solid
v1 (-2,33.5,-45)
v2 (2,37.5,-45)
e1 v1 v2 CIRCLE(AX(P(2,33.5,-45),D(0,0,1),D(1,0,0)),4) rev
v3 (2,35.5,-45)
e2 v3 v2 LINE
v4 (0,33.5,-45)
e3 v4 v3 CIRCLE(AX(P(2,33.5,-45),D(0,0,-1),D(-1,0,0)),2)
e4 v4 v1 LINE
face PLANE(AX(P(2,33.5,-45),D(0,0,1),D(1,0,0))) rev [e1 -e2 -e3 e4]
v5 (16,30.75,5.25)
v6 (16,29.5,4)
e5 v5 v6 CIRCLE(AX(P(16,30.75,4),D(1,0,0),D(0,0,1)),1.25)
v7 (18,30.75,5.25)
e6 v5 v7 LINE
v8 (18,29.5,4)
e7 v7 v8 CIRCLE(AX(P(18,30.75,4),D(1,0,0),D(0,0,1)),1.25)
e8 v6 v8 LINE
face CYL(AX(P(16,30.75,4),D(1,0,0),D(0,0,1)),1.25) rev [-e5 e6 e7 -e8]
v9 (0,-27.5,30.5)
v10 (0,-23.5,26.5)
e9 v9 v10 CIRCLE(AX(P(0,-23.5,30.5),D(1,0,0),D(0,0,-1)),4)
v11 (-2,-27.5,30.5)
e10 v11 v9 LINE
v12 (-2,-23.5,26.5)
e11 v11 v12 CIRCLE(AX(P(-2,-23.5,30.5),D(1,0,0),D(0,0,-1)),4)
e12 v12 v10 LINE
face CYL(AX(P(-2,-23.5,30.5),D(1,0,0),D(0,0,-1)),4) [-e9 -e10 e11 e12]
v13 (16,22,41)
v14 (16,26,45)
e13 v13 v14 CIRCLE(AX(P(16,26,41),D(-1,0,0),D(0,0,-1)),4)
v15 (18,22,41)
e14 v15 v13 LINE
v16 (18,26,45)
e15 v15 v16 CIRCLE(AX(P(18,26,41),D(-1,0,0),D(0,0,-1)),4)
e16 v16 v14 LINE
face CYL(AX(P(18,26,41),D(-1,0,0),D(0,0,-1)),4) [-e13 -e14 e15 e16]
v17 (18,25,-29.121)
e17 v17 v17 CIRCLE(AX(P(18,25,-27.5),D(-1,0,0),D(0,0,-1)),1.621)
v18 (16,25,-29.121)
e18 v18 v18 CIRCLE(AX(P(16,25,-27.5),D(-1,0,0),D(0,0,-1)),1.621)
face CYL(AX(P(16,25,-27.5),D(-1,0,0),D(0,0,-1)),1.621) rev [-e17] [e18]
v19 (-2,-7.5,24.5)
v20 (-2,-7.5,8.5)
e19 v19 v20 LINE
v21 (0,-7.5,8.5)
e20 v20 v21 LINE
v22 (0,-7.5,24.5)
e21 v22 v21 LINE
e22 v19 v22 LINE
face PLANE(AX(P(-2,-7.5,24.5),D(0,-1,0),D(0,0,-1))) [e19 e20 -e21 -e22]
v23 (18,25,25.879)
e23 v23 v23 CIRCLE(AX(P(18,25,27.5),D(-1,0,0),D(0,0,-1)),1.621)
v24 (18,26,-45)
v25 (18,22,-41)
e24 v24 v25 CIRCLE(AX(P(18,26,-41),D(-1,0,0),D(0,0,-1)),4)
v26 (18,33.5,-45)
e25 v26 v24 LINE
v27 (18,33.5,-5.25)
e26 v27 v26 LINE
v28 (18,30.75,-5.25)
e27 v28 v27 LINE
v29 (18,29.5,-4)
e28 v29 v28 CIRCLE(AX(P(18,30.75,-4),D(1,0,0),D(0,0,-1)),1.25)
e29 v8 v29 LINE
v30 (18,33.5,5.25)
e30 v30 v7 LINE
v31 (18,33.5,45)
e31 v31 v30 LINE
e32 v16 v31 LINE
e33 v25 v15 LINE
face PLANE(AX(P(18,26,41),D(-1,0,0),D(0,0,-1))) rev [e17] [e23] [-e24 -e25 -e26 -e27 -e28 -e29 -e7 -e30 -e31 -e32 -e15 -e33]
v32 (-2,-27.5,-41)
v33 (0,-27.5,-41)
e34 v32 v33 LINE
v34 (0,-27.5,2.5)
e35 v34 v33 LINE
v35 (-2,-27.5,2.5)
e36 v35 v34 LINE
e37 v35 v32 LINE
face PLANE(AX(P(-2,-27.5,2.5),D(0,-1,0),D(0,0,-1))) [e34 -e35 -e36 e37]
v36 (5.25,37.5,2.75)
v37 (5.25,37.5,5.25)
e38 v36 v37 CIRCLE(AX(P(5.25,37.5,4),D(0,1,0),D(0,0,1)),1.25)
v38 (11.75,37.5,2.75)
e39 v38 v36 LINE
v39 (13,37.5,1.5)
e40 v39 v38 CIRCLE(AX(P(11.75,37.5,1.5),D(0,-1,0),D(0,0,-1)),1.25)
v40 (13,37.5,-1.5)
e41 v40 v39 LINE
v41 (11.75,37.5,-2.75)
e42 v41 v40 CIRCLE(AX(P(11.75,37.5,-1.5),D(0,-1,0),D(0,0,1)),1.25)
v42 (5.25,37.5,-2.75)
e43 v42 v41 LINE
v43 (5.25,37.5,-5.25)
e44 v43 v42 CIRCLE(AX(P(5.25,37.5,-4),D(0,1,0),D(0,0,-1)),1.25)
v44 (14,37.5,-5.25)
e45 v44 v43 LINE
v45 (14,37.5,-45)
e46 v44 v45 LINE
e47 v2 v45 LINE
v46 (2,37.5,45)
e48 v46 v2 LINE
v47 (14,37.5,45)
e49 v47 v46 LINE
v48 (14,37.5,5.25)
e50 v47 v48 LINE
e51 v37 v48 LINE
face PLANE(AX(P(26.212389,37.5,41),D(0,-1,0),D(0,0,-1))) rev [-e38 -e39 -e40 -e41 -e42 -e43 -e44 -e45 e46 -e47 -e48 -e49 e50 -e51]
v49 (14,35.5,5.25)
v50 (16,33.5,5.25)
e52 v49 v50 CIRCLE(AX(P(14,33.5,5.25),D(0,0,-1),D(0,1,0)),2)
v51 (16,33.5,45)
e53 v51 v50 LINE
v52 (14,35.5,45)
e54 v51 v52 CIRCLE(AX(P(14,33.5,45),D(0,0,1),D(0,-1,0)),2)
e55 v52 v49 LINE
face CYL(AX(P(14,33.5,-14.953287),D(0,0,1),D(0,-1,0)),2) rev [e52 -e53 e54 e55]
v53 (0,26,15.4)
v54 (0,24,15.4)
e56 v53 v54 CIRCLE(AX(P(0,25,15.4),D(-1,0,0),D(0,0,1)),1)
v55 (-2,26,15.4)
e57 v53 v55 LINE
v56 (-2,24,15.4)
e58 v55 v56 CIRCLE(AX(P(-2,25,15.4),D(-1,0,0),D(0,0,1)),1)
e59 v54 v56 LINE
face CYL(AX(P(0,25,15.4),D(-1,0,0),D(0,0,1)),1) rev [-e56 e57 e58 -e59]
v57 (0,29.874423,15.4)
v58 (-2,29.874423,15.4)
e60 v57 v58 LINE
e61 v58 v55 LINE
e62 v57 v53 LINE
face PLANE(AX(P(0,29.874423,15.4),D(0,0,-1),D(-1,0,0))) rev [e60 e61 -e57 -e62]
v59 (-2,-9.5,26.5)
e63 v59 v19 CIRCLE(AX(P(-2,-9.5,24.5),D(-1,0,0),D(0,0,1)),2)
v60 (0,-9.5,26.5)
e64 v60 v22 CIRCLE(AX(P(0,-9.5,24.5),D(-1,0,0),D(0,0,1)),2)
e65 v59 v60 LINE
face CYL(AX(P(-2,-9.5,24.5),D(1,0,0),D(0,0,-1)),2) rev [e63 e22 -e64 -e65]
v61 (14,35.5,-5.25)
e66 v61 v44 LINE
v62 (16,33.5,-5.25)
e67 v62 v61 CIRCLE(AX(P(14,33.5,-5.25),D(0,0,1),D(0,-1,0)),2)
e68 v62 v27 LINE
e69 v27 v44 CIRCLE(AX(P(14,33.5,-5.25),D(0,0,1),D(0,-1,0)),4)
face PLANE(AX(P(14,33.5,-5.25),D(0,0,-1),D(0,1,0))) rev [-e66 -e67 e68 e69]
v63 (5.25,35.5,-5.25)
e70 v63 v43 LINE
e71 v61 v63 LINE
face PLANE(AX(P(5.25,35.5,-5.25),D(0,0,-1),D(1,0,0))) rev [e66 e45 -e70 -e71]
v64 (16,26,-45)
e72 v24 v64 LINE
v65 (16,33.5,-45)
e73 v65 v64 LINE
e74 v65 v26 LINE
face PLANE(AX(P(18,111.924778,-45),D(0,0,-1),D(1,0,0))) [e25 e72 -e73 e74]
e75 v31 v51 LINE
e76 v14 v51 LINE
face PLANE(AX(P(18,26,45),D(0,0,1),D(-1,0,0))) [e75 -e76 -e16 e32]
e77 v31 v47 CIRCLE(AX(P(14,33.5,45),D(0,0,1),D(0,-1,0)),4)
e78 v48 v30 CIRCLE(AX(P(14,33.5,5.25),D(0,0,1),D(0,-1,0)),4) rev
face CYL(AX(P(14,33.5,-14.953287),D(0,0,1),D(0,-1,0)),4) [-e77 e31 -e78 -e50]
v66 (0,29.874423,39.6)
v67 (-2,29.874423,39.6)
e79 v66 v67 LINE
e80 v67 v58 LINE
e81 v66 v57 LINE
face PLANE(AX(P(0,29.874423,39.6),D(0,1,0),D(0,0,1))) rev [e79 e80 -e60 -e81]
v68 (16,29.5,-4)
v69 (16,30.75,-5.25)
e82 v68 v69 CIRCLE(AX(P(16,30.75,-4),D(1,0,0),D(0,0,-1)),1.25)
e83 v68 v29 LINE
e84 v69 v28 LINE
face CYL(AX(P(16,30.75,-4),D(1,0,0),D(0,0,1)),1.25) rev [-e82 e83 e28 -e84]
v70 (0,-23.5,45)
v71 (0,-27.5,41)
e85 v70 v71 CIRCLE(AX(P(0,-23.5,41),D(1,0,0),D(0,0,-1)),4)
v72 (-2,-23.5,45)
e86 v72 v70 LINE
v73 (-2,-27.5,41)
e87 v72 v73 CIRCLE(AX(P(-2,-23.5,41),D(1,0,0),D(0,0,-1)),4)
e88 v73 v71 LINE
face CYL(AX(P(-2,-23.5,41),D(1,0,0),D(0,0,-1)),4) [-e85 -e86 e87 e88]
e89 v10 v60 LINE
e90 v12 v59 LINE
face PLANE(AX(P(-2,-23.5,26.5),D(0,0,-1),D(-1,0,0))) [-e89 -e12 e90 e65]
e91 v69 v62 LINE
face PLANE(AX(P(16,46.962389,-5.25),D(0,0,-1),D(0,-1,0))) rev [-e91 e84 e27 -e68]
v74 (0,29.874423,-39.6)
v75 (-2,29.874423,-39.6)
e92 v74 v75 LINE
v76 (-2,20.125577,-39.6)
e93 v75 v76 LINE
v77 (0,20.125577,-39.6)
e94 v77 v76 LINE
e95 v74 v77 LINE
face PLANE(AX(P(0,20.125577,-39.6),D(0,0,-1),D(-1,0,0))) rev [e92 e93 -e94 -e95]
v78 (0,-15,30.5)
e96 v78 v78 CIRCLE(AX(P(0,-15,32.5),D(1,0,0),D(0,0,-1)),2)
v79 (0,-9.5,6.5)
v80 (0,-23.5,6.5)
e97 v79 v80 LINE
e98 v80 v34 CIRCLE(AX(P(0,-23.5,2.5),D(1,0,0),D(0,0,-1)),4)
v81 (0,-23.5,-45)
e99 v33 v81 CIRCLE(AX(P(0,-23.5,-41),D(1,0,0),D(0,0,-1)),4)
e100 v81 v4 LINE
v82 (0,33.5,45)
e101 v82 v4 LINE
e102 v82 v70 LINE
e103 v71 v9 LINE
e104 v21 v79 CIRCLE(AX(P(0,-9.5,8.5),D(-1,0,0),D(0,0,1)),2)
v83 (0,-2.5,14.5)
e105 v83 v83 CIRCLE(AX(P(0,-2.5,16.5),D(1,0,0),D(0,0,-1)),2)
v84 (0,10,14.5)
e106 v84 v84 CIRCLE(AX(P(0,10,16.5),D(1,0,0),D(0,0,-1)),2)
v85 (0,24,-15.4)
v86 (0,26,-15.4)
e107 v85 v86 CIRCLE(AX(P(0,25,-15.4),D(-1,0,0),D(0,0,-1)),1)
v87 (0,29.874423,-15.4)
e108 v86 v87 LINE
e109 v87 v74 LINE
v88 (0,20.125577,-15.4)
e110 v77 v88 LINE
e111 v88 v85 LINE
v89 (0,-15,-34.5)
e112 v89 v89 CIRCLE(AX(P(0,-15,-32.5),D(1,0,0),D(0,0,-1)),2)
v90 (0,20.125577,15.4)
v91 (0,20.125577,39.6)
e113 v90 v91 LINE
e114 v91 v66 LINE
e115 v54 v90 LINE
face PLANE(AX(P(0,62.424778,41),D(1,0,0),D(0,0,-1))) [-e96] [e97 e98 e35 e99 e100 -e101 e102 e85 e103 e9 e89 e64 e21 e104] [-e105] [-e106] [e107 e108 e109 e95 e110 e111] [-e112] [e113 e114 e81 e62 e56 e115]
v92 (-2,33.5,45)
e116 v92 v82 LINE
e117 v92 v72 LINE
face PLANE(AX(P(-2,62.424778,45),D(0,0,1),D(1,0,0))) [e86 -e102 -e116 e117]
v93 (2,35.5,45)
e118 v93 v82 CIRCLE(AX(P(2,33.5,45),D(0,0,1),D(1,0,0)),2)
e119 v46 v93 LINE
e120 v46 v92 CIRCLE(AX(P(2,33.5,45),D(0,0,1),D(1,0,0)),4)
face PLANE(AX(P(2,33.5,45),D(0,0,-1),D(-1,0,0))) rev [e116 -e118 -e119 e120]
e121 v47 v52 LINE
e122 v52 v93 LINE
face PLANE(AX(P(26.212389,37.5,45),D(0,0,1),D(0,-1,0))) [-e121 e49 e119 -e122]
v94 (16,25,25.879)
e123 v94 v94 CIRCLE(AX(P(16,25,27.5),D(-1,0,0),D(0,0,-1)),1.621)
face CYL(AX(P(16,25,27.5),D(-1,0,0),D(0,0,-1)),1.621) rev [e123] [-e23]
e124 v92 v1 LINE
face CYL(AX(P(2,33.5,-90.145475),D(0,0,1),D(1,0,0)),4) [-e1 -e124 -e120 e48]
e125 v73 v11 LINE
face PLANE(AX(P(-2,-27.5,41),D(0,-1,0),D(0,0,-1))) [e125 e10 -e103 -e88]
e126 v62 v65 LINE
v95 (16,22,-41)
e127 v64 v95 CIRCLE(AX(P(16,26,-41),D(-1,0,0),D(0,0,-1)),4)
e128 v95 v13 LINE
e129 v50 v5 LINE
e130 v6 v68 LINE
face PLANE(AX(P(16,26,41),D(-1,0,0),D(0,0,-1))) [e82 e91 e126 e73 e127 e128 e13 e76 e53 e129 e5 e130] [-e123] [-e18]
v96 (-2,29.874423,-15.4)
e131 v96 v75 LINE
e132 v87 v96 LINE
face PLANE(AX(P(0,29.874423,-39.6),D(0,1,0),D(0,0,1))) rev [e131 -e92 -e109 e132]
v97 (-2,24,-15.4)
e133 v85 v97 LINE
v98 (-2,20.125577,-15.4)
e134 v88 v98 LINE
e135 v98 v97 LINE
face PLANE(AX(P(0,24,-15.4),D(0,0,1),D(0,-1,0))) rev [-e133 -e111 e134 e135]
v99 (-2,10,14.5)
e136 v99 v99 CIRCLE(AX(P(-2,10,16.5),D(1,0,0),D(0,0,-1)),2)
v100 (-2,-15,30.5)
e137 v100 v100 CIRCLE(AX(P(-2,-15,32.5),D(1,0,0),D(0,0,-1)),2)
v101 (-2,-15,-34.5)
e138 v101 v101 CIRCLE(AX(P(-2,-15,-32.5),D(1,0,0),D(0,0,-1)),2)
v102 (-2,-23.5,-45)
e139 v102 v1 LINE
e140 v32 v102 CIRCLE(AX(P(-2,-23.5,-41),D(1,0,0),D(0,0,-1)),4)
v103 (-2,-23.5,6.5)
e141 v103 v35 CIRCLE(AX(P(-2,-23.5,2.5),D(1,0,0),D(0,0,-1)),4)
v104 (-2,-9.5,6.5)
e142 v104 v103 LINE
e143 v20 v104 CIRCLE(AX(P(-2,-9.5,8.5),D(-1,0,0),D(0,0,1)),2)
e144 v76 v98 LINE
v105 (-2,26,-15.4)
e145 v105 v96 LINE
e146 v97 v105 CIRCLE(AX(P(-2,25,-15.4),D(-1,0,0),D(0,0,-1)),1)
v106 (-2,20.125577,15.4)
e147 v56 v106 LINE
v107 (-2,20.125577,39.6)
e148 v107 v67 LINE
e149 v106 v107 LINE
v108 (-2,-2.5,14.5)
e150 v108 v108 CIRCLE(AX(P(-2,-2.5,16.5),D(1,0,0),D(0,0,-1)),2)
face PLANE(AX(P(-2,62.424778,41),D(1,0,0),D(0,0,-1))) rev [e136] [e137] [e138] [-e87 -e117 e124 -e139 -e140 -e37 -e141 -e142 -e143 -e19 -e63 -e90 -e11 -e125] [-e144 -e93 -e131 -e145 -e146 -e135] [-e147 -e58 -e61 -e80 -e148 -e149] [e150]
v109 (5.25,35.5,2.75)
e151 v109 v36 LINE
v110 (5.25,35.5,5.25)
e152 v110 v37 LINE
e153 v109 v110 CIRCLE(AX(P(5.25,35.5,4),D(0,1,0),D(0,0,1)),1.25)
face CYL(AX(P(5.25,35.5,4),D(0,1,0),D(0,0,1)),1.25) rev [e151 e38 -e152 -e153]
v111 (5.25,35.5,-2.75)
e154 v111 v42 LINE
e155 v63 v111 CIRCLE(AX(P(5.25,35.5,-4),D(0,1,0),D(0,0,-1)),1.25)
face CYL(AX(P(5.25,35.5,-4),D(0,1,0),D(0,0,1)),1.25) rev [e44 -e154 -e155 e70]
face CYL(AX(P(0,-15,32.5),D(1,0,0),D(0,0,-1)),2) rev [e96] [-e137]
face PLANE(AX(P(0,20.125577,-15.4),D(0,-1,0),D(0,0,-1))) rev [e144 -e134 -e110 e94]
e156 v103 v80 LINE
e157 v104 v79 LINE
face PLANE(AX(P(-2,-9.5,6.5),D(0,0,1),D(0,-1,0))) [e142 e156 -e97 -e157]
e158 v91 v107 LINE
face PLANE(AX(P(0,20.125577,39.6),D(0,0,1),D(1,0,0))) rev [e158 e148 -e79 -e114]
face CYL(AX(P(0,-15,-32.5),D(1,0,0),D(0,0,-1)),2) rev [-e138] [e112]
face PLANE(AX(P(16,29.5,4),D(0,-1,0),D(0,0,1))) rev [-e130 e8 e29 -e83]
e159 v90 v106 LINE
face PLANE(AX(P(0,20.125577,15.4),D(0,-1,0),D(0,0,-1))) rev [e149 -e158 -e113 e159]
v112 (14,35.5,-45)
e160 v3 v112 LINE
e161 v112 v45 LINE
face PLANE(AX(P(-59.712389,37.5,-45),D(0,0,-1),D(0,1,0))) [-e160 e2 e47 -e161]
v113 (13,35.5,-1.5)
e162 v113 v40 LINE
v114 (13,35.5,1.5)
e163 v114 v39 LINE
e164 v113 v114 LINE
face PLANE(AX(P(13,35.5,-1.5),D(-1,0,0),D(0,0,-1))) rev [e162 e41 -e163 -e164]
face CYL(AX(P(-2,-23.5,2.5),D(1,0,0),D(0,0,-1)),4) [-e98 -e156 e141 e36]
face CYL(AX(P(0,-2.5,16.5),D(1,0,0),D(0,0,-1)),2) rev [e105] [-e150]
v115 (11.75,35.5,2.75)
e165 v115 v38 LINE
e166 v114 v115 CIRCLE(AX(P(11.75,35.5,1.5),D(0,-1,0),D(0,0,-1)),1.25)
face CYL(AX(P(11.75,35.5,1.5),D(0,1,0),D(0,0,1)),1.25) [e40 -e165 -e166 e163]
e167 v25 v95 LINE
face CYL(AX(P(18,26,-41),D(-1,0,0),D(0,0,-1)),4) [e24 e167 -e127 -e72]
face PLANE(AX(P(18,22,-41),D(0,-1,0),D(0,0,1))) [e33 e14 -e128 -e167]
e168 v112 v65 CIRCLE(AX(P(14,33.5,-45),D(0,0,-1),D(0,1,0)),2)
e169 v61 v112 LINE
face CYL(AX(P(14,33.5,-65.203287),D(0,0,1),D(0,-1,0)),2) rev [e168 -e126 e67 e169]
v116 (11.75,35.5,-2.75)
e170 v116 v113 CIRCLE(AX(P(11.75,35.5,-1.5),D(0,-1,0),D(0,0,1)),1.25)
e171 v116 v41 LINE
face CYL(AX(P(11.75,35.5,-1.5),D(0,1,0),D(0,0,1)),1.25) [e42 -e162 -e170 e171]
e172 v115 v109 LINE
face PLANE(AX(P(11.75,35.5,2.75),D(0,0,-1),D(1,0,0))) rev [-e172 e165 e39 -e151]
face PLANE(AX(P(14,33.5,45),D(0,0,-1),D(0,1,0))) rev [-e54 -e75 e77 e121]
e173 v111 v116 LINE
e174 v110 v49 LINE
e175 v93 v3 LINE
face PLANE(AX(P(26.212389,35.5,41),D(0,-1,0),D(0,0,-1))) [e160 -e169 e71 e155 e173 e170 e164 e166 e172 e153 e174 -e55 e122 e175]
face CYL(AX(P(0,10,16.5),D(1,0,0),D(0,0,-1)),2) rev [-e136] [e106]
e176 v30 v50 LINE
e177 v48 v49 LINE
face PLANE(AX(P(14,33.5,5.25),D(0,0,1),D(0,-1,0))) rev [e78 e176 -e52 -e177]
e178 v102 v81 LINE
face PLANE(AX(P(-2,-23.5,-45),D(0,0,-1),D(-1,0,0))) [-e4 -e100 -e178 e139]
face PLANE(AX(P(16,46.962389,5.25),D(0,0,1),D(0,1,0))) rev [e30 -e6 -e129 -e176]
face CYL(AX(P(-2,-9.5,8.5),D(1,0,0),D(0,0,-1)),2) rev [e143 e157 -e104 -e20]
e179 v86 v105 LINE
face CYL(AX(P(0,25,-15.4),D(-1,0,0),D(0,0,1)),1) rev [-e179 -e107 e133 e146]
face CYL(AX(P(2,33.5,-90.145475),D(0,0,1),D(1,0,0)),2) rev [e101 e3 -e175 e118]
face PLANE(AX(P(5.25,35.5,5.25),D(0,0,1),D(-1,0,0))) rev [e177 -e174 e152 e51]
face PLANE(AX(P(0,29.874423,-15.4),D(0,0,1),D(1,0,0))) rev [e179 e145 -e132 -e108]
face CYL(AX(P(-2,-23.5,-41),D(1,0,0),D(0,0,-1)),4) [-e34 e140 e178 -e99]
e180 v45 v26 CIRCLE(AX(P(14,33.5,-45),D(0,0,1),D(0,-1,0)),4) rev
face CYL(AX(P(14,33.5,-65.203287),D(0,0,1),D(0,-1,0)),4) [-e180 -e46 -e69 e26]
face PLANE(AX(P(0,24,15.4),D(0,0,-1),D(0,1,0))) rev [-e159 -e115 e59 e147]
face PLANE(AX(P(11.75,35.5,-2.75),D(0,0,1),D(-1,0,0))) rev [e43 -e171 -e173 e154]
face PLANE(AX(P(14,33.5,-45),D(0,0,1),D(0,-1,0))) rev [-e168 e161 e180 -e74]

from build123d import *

# Parameters (mm, degrees)
BOSS_EXTRUDE1_DEPTH         = 2
F_4_0_4_DIAMETER_HOLE1_D    = 4
M3_CLEARANCE_HOLE1_D        = 3.242
CUT_EXTRUDE2_DEPTH          = 81.257405435
CUT_EXTRUDE3_DEPTH          = 81.257405435
SKETCHED_START              = 53.789908981
SKETCHED_BEND1_OUTLINE_W    = 2
SKETCHED_BEND1_OUTLINE_H    = 90
SKETCHED_BEND1_DEPTH        = 12.63486898
SKETCHED_START_2            = 52.212388981
SKETCHED_BEND1_2_OUTLINE_R  = 1.621
SKETCHED_BEND1_2_DEPTH      = 1.137013932
SKETCHED_START_3            = 50.212388981
SKETCHED_BEND1_3_OUTLINE_R  = 1.621
SKETCHED_BEND1_3_DEPTH      = 4
SKETCHED_START_4            = -45
SKETCHED_BEND1_4_DEPTH      = 90
SKETCHED_START_5            = -2
SKETCHED_BEND2_OUTLINE_W    = 16.712388981
SKETCHED_BEND2_OUTLINE_H    = 90
SKETCHED_BEND2_DEPTH        = 15.5
SKETCHED_BEND2_2_OUTLINE_W  = 2
SKETCHED_BEND2_2_OUTLINE_H  = 90
SKETCHED_BEND2_2_DEPTH      = 0.20548
SKETCHED_START_6            = 2
SKETCHED_BEND2_3_OUTLINE_W  = 2
SKETCHED_BEND2_3_OUTLINE_H  = 39.75
SKETCHED_BEND2_3_DEPTH      = 12
SKETCHED_START_7            = 1.58904
SKETCHED_BEND2_4_OUTLINE_W  = 2
SKETCHED_BEND2_4_OUTLINE_H  = 5.5
SKETCHED_BEND2_4_DEPTH      = 10.160960011
SKETCHED_BEND2_5_OUTLINE_W  = 2
SKETCHED_BEND2_5_OUTLINE_H  = 2.5
SKETCHED_BEND2_5_DEPTH      = 2.410960011
SKETCHED_START_8            = 14
SKETCHED_BEND2_6_OUTLINE_R  = 1.621
SKETCHED_BEND2_6_DEPTH      = 4
SKETCHED_BEND2_7_OUTLINE_R  = 1.621
SKETCHED_BEND2_7_DEPTH      = 2
SKETCHED_START_9            = 11.750000011
SKETCHED_BEND2_8_OUTLINE_W  = 2
SKETCHED_BEND2_8_OUTLINE_H  = 5.5
SKETCHED_BEND2_8_DEPTH      = 1.25
SKETCHED_START_10           = 4.000000011
SKETCHED_BEND2_9_OUTLINE_W  = 2
SKETCHED_BEND2_9_OUTLINE_H  = 2.5
SKETCHED_BEND2_9_DEPTH      = 1.25
SKETCHED_BEND2_10_DEPTH     = 90
SKETCHED_START_11           = 30
SKETCHED_BEND2_11_OUTLINE_W = 2
SKETCHED_BEND2_11_OUTLINE_H = 39.75
SKETCHED_BEND2_11_DEPTH     = 1.443495006
SKETCHED_START_12           = 37.29452
SKETCHED_BEND2_12_OUTLINE_W = 2
SKETCHED_BEND2_12_OUTLINE_H = 39.75
SKETCHED_BEND2_12_DEPTH     = 0.20548
SKETCHED_START_13           = 31.443495006
SKETCHED_BEND2_13_DEPTH     = 5.861984994


with BuildPart() as part:
    # Sketch7 → Boss-Extrude1 (new body)
    with BuildSketch(Plane(origin=(0, 0, 0), x_dir=(0, 0, -1), z_dir=(1, 0, 0))):
        with BuildLine():
            Line((-45, 62.424777961), (-45, -23.5))
            ThreePointArc((-45, -23.5), (-43.828427125, -26.328427125), (-41, -27.5))
            Line((-41, -27.5), (-30.5, -27.5))
            ThreePointArc((-30.5, -27.5), (-27.671572875, -26.328427125), (-26.5, -23.5))
            Line((-26.5, -23.5), (-26.5, -9.5))
            ThreePointArc((-26.5, -9.5), (-25.914213562, -8.085786438), (-24.5, -7.5))
            Line((-24.5, -7.5), (-8.5, -7.5))
            ThreePointArc((-8.5, -7.5), (-7.085786438, -8.085786438), (-6.5, -9.5))
            Line((-6.5, -9.5), (-6.5, -23.5))
            ThreePointArc((-6.5, -23.5), (-5.328427125, -26.328427125), (-2.5, -27.5))
            Line((-2.5, -27.5), (41, -27.5))
            ThreePointArc((41, -27.5), (43.828427125, -26.328427125), (45, -23.5))
            Line((45, -23.5), (45, 62.424777961))
            ThreePointArc((45, 62.424777961), (43.828427125, 65.253205086), (41, 66.424777961))
            Line((41, 66.424777961), (-41, 66.424777961))
            ThreePointArc((-41, 66.424777961), (-43.828427125, 65.253205086), (-45, 62.424777961))
        make_face()
    extrude(amount=-BOSS_EXTRUDE1_DEPTH)

    # Ø4.0 (4) Diameter Hole1 (through all)
    with Locations(Plane(origin=(0, 0, 0), x_dir=(0, 0, -1), z_dir=(1, 0, 0))):
        with Locations((-16.5, -2.5), (32.5, -15), (-16.5, 10), (-32.5, -15)):
            Hole(F_4_0_4_DIAMETER_HOLE1_D / 2)

    # M3 Clearance Hole1 (through all)
    with Locations(Plane(origin=(0, 0, 0), x_dir=(0, 0, -1), z_dir=(1, 0, 0))):
        with Locations((-27.5, 63.424777961), (27.5, 63.424777961)):
            Hole(M3_CLEARANCE_HOLE1_D / 2)

    # Sketch13 → Cut-Extrude2 (cut, through all)
    with BuildSketch(Plane.ZY.offset(2)):
        with BuildLine():
            Line((39.6, 29.874423052), (15.4, 29.874423052))
            Line((15.4, 29.874423052), (15.4, 26))
            ThreePointArc((15.4, 26), (14.4, 25), (15.4, 24))
            Line((15.4, 24), (15.4, 20.125576948))
            Line((15.4, 20.125576948), (39.6, 20.125576948))
            Line((39.6, 20.125576948), (39.6, 29.874423052))
        make_face()
        with BuildLine():
            Line((-15.4, 24), (-15.4, 20.125576948))
            Line((-15.4, 20.125576948), (-39.6, 20.125576948))
            Line((-39.6, 20.125576948), (-39.6, 29.874423052))
            Line((-39.6, 29.874423052), (-15.4, 29.874423052))
            Line((-15.4, 29.874423052), (-15.4, 26))
            ThreePointArc((-15.4, 26), (-14.4, 25), (-15.4, 24))
        make_face()
    extrude(amount=-CUT_EXTRUDE2_DEPTH, mode=Mode.SUBTRACT)

    # Sketch14 → Cut-Extrude3 (cut, through all)
    with BuildSketch(Plane.ZY.offset(2)):
        with BuildLine():
            Line((5.25, 41.462388992), (5.25, 57.674777954))
            ThreePointArc((5.25, 57.674777954), (4.883883476, 58.55866143), (4, 58.924777954))
            Line((4, 58.924777954), (-4, 58.924777954))
            ThreePointArc((-4, 58.924777954), (-4.883883476, 58.55866143), (-5.25, 57.674777954))
            Line((-5.25, 57.674777954), (-5.25, 41.462388992))
            ThreePointArc((-5.25, 41.462388992), (-4, 40.212388992), (-2.75, 41.462388992))
            Line((-2.75, 41.462388992), (-2.75, 47.962388992))
            ThreePointArc((-2.75, 47.962388992), (-2.383883476, 48.846272468), (-1.5, 49.212388992))
            Line((-1.5, 49.212388992), (1.5, 49.212388992))
            ThreePointArc((1.5, 49.212388992), (2.383883476, 48.846272468), (2.75, 47.962388992))
            Line((2.75, 47.962388992), (2.75, 41.462388992))
            ThreePointArc((2.75, 41.462388992), (4, 40.212388992), (5.25, 41.462388992))
        make_face()
    extrude(amount=-CUT_EXTRUDE3_DEPTH, mode=Mode.SUBTRACT)

    # Sketched Bend1: read off the stored shape, not the designer's step
    # Sketched Bend1 outline → Sketched Bend1 (cut)
    with BuildSketch(Plane(origin=(0, 0, 0), x_dir=(1, 0, 0), z_dir=(0, 1, 0)).offset(SKETCHED_START)):
        with Locations((-1, 0)):
            Rectangle(SKETCHED_BEND1_OUTLINE_W, SKETCHED_BEND1_OUTLINE_H)
    extrude(amount=SKETCHED_BEND1_DEPTH, mode=Mode.SUBTRACT)

    # Sketched Bend1 2 outline → Sketched Bend1 2 (add)
    with BuildSketch(Plane(origin=(0, 0, 0), x_dir=(1, 0, 0), z_dir=(0, 1, 0)).offset(SKETCHED_START_2)):
        with BuildLine():
            ThreePointArc((13.5, 41), (12.328427125, 43.828427125), (9.5, 45))
            Line((9.5, 45), (0, 45))
            Line((0, 45), (0, 5.25))
            Line((0, 5.25), (4.749999993, 5.25))
            ThreePointArc((4.749999993, 5.25), (5.633883469, 4.883883476), (5.999999993, 4))
            Line((5.999999993, 4), (5.999999993, -4))
            ThreePointArc((5.999999993, -4), (5.633883469, -4.883883476), (4.749999993, -5.25))
            Line((4.749999993, -5.25), (0, -5.25))
            Line((0, -5.25), (0, -45))
            Line((0, -45), (9.5, -45))
            ThreePointArc((9.5, -45), (12.328427125, -43.828427125), (13.5, -41))
            Line((13.5, -41), (13.5, 41))
        make_face()
        with Locations((10.5, -27.5)):
            Circle(SKETCHED_BEND1_2_OUTLINE_R, mode=Mode.SUBTRACT)
        with Locations((10.5, 27.5)):
            Circle(SKETCHED_BEND1_2_OUTLINE_R, mode=Mode.SUBTRACT)
    extrude(amount=SKETCHED_BEND1_2_DEPTH)

    # Sketched Bend1 3 outline → Sketched Bend1 3 (add)
    with BuildSketch(Plane(origin=(0, 0, 0), x_dir=(1, 0, 0), z_dir=(0, 1, 0)).offset(SKETCHED_START_3)):
        with BuildLine():
            ThreePointArc((13.5, 41), (12.328427125, 43.828427125), (9.5, 45))
            Line((9.5, 45), (0, 45))
            Line((0, 45), (0, 5.25))
            Line((0, 5.25), (4.749999993, 5.25))
            ThreePointArc((4.749999993, 5.25), (5.633883469, 4.883883476), (5.999999993, 4))
            Line((5.999999993, 4), (5.999999993, -4))
            ThreePointArc((5.999999993, -4), (5.633883469, -4.883883476), (4.749999993, -5.25))
            Line((4.749999993, -5.25), (0, -5.25))
            Line((0, -5.25), (0, -45))
            Line((0, -45), (9.5, -45))
            ThreePointArc((9.5, -45), (12.328427125, -43.828427125), (13.5, -41))
            Line((13.5, -41), (13.5, 41))
        make_face()
        with Locations((10.5, -27.5)):
            Circle(SKETCHED_BEND1_3_OUTLINE_R, mode=Mode.SUBTRACT)
        with Locations((10.5, 27.5)):
            Circle(SKETCHED_BEND1_3_OUTLINE_R, mode=Mode.SUBTRACT)
    extrude(amount=SKETCHED_BEND1_3_DEPTH)

    # Sketched Bend1 4 outline → Sketched Bend1 4 (cut)
    with BuildSketch(Plane.XY.offset(SKETCHED_START_4)):
        with BuildLine():
            ThreePointArc((-2, 50.212388981), (-0.828427125, 53.040816106), (2, 54.212388981))
            Line((2, 54.212388981), (0, 54.212388981))
            Line((0, 54.212388981), (0, 53.789908981))
            Line((0, 53.789908981), (-2, 53.789908981))
            Line((-2, 53.789908981), (-2, 50.212388981))
        make_face()
        with BuildLine():
            ThreePointArc((2, 52.212388981), (0.585786438, 51.626602543), (0, 50.212388981))
            Line((0, 50.212388981), (13.5, 50.212388981))
            Line((13.5, 50.212388981), (13.5, 52.212388981))
            Line((13.5, 52.212388981), (2, 52.212388981))
        make_face()
    extrude(amount=SKETCHED_BEND1_4_DEPTH, mode=Mode.SUBTRACT)

    # Sketched Bend2: read off the stored shape, not the designer's step
    # Sketched Bend2 outline → Sketched Bend2 (cut)
    with BuildSketch(Plane.YZ.offset(SKETCHED_START_5)):
        with Locations((45.856194491, 0)):
            Rectangle(SKETCHED_BEND2_OUTLINE_W, SKETCHED_BEND2_OUTLINE_H)
        with BuildLine():
            Line((52.212388981, 5.25), (52.212388981, -5.25))
            Line((52.212388981, -5.25), (41.462388992, -5.25))
            ThreePointArc((41.462388992, -5.25), (40.212388992, -4), (41.462388992, -2.75))
            Line((41.462388992, -2.75), (47.962388992, -2.75))
            ThreePointArc((47.962388992, -2.75), (48.846272468, -2.383883476), (49.212388992, -1.5))
            Line((49.212388992, -1.5), (49.212388992, 1.5))
            ThreePointArc((49.212388992, 1.5), (48.846272468, 2.383883476), (47.962388992, 2.75))
            Line((47.962388992, 2.75), (41.462388992, 2.75))
            ThreePointArc((41.462388992, 2.75), (40.212388992, 4), (41.462388992, 5.25))
            Line((41.462388992, 5.25), (52.212388981, 5.25))
        make_face(mode=Mode.SUBTRACT)
    extrude(amount=SKETCHED_BEND2_DEPTH, mode=Mode.SUBTRACT)

    # Sketched Bend2 2 outline → Sketched Bend2 2 (cut)
    with BuildSketch(Plane.YZ.offset(SKETCHED_START_5)):
        with Locations((36.5, 0)):
            Rectangle(SKETCHED_BEND2_2_OUTLINE_W, SKETCHED_BEND2_2_OUTLINE_H)
    extrude(amount=SKETCHED_BEND2_2_DEPTH, mode=Mode.SUBTRACT)



with BuildPart() as body_2:
    # Sketched Bend2 3 outline → Sketched Bend2 3 (new body)
    with BuildSketch(Plane.YZ.offset(SKETCHED_START_6)):
        with Locations((36.5, 25.125)):
            Rectangle(SKETCHED_BEND2_3_OUTLINE_W, SKETCHED_BEND2_3_OUTLINE_H)
        with Locations((36.5, -25.125)):
            Rectangle(SKETCHED_BEND2_3_OUTLINE_W, SKETCHED_BEND2_3_OUTLINE_H)
    extrude(amount=SKETCHED_BEND2_3_DEPTH)



with BuildPart() as body_3:
    # Sketched Bend2 4 outline → Sketched Bend2 4 (new body)
    with BuildSketch(Plane.YZ.offset(SKETCHED_START_7)):
        with Locations((36.5, 0)):
            Rectangle(SKETCHED_BEND2_4_OUTLINE_W, SKETCHED_BEND2_4_OUTLINE_H)
    extrude(amount=SKETCHED_BEND2_4_DEPTH)


with BuildPart() as body_2_1:
    add(body_2.part)

    add(body_3.part)  # Sketched Bend2 5 merges body 3
    # Sketched Bend2 5 outline → Sketched Bend2 5 (add)
    with BuildSketch(Plane.YZ.offset(SKETCHED_START_7)):
        with Locations((36.5, 4)):
            Rectangle(SKETCHED_BEND2_5_OUTLINE_W, SKETCHED_BEND2_5_OUTLINE_H)
        with Locations((36.5, -4)):
            Rectangle(SKETCHED_BEND2_5_OUTLINE_W, SKETCHED_BEND2_5_OUTLINE_H)
    extrude(amount=SKETCHED_BEND2_5_DEPTH)

    # Sketched Bend2 6 outline → Sketched Bend2 6 (add)
    with BuildSketch(Plane.YZ.offset(SKETCHED_START_8)):
        with BuildLine():
            Line((37.5, 45), (26, 45))
            ThreePointArc((26, 45), (23.171572875, 43.828427125), (22, 41))
            Line((22, 41), (22, -41))
            ThreePointArc((22, -41), (23.171572875, -43.828427125), (26, -45))
            Line((26, -45), (37.5, -45))
            Line((37.5, -45), (37.5, -5.25))
            Line((37.5, -5.25), (30.750000007, -5.25))
            ThreePointArc((30.750000007, -5.25), (29.866116531, -4.883883476), (29.500000007, -4))
            Line((29.500000007, -4), (29.500000007, 4))
            ThreePointArc((29.500000007, 4), (29.866116531, 4.883883476), (30.750000007, 5.25))
            Line((30.750000007, 5.25), (37.5, 5.25))
            Line((37.5, 5.25), (37.5, 45))
        make_face()
        with Locations((25, 27.5)):
            Circle(SKETCHED_BEND2_6_OUTLINE_R, mode=Mode.SUBTRACT)
        with Locations((25, -27.5)):
            Circle(SKETCHED_BEND2_6_OUTLINE_R, mode=Mode.SUBTRACT)
    extrude(amount=SKETCHED_BEND2_6_DEPTH)


with BuildPart() as part_1:
    add(part.part)

    add(body_2_1.part)  # Sketched Bend2 7 merges body 2
    # Sketched Bend2 7 outline → Sketched Bend2 7 (add)
    with BuildSketch(Plane.YZ):
        with BuildLine():
            Line((37.5, 45), (26, 45))
            ThreePointArc((26, 45), (23.171572875, 43.828427125), (22, 41))
            Line((22, 41), (22, -41))
            ThreePointArc((22, -41), (23.171572875, -43.828427125), (26, -45))
            Line((26, -45), (37.5, -45))
            Line((37.5, -45), (37.5, 45))
        make_face()
        with Locations((25, 27.5)):
            Circle(SKETCHED_BEND2_7_OUTLINE_R, mode=Mode.SUBTRACT)
        with Locations((25, -27.5)):
            Circle(SKETCHED_BEND2_7_OUTLINE_R, mode=Mode.SUBTRACT)
    extrude(amount=SKETCHED_BEND2_7_DEPTH)

    # Sketched Bend2 8 outline → Sketched Bend2 8 (add)
    with BuildSketch(Plane.YZ.offset(SKETCHED_START_9)):
        with Locations((36.5, 0)):
            Rectangle(SKETCHED_BEND2_8_OUTLINE_W, SKETCHED_BEND2_8_OUTLINE_H)
    extrude(amount=SKETCHED_BEND2_8_DEPTH)

    # Sketched Bend2 9 outline → Sketched Bend2 9 (add)
    with BuildSketch(Plane.YZ.offset(SKETCHED_START_10)):
        with Locations((36.5, 4)):
            Rectangle(SKETCHED_BEND2_9_OUTLINE_W, SKETCHED_BEND2_9_OUTLINE_H)
        with Locations((36.5, -4)):
            Rectangle(SKETCHED_BEND2_9_OUTLINE_W, SKETCHED_BEND2_9_OUTLINE_H)
    extrude(amount=SKETCHED_BEND2_9_DEPTH)

    # Sketched Bend2 10 outline → Sketched Bend2 10 (cut)
    with BuildSketch(Plane.XY.offset(SKETCHED_START_4)):
        with BuildLine():
            ThreePointArc((16, 33.5), (15.414213563, 34.914213563), (14, 35.5))
            Line((14, 35.5), (14, 22))
            Line((14, 22), (16, 22))
            Line((16, 22), (16, 33.5))
        make_face()
        with BuildLine():
            Line((2, 22), (2, 35.5))
            ThreePointArc((2, 35.5), (0.585786438, 34.914213562), (0, 33.5))
            Line((0, 33.5), (0, 22))
            Line((0, 22), (2, 22))
        make_face()
        with BuildLine():
            ThreePointArc((-2, 33.5), (-0.828427125, 36.328427125), (2, 37.5))
            Line((2, 37.5), (-1.79452, 37.5))
            Line((-1.79452, 37.5), (-1.79452, 35.5))
            Line((-1.79452, 35.5), (-2, 35.5))
            Line((-2, 35.5), (-2, 33.5))
        make_face()
        with BuildLine():
            ThreePointArc((14, 37.5), (16.828427125, 36.328427125), (18, 33.5))
            Line((18, 33.5), (18, 37.5))
            Line((18, 37.5), (14, 37.5))
        make_face()
    extrude(amount=SKETCHED_BEND2_10_DEPTH, mode=Mode.SUBTRACT)

    # Sketched Bend2 11 outline → Sketched Bend2 11 (cut)
    with BuildSketch(Plane(origin=(0, 0, 0), x_dir=(1, 0, 0), z_dir=(0, 1, 0)).offset(SKETCHED_START_11)):
        with Locations((15, -25.125)):
            Rectangle(SKETCHED_BEND2_11_OUTLINE_W, SKETCHED_BEND2_11_OUTLINE_H)
        with Locations((15, 25.125)):
            Rectangle(SKETCHED_BEND2_11_OUTLINE_W, SKETCHED_BEND2_11_OUTLINE_H)
    extrude(amount=SKETCHED_BEND2_11_DEPTH, mode=Mode.SUBTRACT)

    # Sketched Bend2 12 outline → Sketched Bend2 12 (cut)
    with BuildSketch(Plane(origin=(0, 0, 0), x_dir=(1, 0, 0), z_dir=(0, 1, 0)).offset(SKETCHED_START_12)):
        with BuildLine():
            Line((5.250000011, -5.25), (5.250000011, -2.75))
            ThreePointArc((5.250000011, -2.75), (4.000000011, -4), (5.250000011, -5.25))
        make_face()
        with BuildLine():
            ThreePointArc((13.000000011, -1.5), (12.633883488, -2.383883477), (11.750000011, -2.75))
            Line((11.750000011, -2.75), (13.000000011, -2.75))
            Line((13.000000011, -2.75), (13.000000011, -1.5))
        make_face()
        with Locations((17, -25.125)):
            Rectangle(SKETCHED_BEND2_12_OUTLINE_W, SKETCHED_BEND2_12_OUTLINE_H)
        with BuildLine():
            ThreePointArc((11.750000011, 2.75), (12.633883488, 2.383883477), (13.000000011, 1.5))
            Line((13.000000011, 1.5), (13.000000011, 2.75))
            Line((13.000000011, 2.75), (11.750000011, 2.75))
        make_face()
        with Locations((17, 25.125)):
            Rectangle(SKETCHED_BEND2_12_OUTLINE_W, SKETCHED_BEND2_12_OUTLINE_H)
        with BuildLine():
            Line((5.250000011, 2.75), (5.250000011, 5.25))
            ThreePointArc((5.250000011, 5.25), (4.000000011, 4), (5.250000011, 2.75))
        make_face()
    extrude(amount=SKETCHED_BEND2_12_DEPTH, mode=Mode.SUBTRACT)

    # Sketched Bend2 13 outline → Sketched Bend2 13 (cut)
    with BuildSketch(Plane(origin=(0, 0, 0), x_dir=(1, 0, 0), z_dir=(0, 1, 0)).offset(SKETCHED_START_13)):
        with BuildLine():
            Line((5.250000011, -5.25), (5.250000011, -2.75))
            ThreePointArc((5.250000011, -2.75), (4.000000011, -4), (5.250000011, -5.25))
        make_face()
        with BuildLine():
            ThreePointArc((13.000000011, -1.5), (12.633883488, -2.383883477), (11.750000011, -2.75))
            Line((11.750000011, -2.75), (13.000000011, -2.75))
            Line((13.000000011, -2.75), (13.000000011, -1.5))
        make_face()
        with BuildLine():
            ThreePointArc((11.750000011, 2.75), (12.633883488, 2.383883477), (13.000000011, 1.5))
            Line((13.000000011, 1.5), (13.000000011, 2.75))
            Line((13.000000011, 2.75), (11.750000011, 2.75))
        make_face()
        with BuildLine():
            Line((5.250000011, 2.75), (5.250000011, 5.25))
            ThreePointArc((5.250000011, 5.25), (4.000000011, 4), (5.250000011, 2.75))
        make_face()
    extrude(amount=SKETCHED_BEND2_13_DEPTH, mode=Mode.SUBTRACT)


solid = part_1.part
